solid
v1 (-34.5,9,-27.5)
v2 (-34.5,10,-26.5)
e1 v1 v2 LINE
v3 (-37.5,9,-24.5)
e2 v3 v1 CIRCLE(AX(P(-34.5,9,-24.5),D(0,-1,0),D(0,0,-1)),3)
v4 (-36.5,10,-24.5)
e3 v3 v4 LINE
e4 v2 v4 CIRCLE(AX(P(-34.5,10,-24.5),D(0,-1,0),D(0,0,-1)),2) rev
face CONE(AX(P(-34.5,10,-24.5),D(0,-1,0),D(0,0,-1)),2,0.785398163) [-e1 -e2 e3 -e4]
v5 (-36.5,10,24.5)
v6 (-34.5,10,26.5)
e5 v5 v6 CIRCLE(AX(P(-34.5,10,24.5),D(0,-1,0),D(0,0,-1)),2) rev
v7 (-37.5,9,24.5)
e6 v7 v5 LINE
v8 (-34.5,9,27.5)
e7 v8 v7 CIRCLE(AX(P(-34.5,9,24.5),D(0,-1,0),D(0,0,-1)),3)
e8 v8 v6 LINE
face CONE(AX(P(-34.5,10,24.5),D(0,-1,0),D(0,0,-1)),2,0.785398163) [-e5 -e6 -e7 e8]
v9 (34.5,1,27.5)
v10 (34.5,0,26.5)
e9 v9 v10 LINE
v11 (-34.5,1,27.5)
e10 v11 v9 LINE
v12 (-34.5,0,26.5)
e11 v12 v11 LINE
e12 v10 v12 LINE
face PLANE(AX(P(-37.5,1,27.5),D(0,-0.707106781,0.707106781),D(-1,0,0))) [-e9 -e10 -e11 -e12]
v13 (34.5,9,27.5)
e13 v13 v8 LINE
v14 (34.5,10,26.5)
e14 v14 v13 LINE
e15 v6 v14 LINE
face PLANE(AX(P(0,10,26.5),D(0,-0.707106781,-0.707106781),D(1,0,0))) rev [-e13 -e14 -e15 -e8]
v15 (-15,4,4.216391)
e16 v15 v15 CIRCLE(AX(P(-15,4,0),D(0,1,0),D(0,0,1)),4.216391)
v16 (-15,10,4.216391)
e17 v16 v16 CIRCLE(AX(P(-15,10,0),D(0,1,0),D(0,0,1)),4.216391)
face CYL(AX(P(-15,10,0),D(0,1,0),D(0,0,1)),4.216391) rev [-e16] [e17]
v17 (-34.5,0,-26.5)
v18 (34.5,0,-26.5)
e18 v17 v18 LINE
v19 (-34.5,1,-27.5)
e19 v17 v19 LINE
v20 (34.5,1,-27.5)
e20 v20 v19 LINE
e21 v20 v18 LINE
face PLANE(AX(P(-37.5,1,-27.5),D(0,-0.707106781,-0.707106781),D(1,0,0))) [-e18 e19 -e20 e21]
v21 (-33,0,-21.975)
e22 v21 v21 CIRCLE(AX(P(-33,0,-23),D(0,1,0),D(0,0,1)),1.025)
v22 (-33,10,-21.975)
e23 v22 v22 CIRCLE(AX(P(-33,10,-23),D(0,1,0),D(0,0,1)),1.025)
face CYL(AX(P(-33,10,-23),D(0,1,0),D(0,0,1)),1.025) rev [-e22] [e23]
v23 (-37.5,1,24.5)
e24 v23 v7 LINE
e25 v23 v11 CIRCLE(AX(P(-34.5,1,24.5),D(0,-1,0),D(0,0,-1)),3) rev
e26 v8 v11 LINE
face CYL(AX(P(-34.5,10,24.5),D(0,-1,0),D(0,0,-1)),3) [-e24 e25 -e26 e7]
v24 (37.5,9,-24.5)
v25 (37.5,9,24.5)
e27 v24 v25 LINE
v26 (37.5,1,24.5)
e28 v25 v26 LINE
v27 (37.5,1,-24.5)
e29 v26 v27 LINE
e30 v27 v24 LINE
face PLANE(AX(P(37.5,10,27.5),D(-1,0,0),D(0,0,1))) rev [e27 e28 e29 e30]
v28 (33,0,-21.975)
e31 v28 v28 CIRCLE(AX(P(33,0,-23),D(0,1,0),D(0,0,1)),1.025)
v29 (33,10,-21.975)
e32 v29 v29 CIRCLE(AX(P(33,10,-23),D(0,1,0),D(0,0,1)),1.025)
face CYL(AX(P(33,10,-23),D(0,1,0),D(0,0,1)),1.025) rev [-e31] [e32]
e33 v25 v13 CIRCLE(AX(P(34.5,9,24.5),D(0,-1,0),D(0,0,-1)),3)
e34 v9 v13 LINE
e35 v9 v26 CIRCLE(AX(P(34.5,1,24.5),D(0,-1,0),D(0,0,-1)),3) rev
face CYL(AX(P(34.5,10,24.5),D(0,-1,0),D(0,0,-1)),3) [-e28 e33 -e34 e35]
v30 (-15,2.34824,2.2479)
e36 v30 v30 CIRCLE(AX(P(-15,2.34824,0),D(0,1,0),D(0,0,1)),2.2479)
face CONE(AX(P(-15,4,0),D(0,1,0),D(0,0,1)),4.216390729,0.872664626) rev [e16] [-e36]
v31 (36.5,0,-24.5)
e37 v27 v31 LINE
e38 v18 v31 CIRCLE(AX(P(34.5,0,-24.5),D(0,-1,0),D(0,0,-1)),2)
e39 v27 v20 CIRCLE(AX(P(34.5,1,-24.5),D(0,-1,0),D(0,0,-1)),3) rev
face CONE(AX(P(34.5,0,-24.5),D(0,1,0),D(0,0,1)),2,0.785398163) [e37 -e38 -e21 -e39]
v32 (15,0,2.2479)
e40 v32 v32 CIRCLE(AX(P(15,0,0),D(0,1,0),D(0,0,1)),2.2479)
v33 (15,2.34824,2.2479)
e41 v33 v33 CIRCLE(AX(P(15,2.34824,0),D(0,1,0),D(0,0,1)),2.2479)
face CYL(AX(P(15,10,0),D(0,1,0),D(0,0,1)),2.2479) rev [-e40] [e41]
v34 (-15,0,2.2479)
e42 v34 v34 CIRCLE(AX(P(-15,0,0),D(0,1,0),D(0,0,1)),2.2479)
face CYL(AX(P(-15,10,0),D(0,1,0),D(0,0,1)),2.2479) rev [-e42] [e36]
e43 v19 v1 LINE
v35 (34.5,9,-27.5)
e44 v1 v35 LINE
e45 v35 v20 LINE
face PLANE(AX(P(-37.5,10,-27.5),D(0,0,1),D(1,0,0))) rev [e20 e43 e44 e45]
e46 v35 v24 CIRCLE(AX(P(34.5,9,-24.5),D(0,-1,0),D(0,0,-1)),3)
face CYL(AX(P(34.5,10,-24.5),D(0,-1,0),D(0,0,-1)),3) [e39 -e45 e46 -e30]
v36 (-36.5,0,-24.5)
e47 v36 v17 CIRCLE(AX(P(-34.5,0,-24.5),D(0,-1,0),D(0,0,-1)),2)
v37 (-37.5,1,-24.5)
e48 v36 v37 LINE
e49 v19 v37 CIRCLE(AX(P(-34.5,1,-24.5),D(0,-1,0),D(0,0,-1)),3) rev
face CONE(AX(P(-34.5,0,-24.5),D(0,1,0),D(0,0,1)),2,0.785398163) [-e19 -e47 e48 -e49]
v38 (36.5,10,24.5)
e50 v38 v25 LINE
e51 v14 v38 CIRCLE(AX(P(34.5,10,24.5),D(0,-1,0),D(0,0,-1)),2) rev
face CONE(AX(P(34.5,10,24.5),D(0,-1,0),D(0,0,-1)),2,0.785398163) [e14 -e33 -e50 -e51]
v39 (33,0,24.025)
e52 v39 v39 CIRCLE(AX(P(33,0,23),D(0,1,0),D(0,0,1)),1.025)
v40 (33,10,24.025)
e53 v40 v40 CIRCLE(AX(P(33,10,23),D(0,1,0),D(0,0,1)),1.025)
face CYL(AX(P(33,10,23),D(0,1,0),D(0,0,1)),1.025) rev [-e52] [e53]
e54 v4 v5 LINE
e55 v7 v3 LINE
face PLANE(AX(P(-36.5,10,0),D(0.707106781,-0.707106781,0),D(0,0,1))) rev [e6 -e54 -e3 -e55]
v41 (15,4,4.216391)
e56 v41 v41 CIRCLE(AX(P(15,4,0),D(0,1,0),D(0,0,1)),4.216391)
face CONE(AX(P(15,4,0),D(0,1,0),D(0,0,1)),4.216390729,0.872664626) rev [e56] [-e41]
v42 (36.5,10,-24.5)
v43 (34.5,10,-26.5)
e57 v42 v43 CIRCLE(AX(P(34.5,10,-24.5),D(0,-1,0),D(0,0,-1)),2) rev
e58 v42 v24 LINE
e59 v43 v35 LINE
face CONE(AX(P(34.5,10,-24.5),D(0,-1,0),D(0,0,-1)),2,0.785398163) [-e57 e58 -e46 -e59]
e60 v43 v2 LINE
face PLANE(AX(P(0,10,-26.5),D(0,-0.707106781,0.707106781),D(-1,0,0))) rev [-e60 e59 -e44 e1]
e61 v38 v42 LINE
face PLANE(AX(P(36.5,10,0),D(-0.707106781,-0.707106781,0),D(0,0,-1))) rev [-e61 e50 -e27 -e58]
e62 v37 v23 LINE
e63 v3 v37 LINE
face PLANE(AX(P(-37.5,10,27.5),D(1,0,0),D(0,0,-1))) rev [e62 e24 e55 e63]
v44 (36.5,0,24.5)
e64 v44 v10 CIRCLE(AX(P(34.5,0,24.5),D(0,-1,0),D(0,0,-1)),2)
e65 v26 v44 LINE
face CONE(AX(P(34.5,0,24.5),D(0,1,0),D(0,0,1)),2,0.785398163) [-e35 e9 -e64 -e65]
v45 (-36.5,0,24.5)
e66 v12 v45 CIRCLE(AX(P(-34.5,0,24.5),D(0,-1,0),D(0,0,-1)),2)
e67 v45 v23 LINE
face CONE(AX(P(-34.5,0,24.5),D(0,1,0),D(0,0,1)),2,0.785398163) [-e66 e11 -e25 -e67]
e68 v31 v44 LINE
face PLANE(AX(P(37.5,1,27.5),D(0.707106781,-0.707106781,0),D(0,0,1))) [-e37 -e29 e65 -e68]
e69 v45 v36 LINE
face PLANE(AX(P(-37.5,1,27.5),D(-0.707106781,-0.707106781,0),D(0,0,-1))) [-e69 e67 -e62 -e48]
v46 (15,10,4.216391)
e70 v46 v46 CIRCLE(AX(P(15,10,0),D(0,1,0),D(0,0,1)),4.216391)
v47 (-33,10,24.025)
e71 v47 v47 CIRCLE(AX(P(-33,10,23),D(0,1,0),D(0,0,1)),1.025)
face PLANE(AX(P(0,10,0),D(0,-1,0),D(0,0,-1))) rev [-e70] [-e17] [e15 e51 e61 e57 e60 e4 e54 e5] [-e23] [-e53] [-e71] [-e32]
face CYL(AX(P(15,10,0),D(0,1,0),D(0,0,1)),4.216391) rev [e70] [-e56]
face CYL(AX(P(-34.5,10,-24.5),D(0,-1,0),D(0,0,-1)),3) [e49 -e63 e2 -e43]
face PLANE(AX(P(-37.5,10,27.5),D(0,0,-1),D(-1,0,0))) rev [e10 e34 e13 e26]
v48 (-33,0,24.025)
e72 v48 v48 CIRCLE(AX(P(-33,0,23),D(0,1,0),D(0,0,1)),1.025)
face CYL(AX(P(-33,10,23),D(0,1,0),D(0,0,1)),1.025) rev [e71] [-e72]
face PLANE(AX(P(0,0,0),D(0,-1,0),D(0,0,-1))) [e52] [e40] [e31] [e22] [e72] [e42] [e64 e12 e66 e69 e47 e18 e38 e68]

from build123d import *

# Parameters (mm, degrees)
SKETCH1_W                                 = 75
SKETCH1_H                                 = 55
BOSS_EXTRUDE1_DEPTH                       = 10
M2_5X0_45_TAPPED_HOLE1_OUTLINE_R          = 1.025
M2_5X0_45_TAPPED_HOLE1_DEPTH              = 10
CSK_FOR_8_FLAT_HEAD_MACHINE_SCREW_2_COUNT = 2
CSK_FOR_8_FLAT_HEAD_MACHINE_SCREW_2_PITCH = 30
FILLET1_R                                 = 3
CHAMFER1_SIZE                             = 1


# Read off the part's stored shape, not the designer's step: M2.5x0.45 Tapped Hole1
with BuildPart() as part:
    # Sketch1 → Boss-Extrude1 (new body)
    with BuildSketch(Plane(origin=(0, 0, 0), x_dir=(1, 0, 0), z_dir=(0, 1, 0))):
        Rectangle(SKETCH1_W, SKETCH1_H)
    extrude(amount=BOSS_EXTRUDE1_DEPTH)

    # M2.5x0.45 Tapped Hole1 outline → M2.5x0.45 Tapped Hole1 (cut)
    with BuildSketch(Plane(origin=(0, 0, 0), x_dir=(1, 0, 0), z_dir=(0, 1, 0))):
        with Locations((33, -23)):
            Circle(M2_5X0_45_TAPPED_HOLE1_OUTLINE_R)
        with Locations((-33, 23)):
            Circle(M2_5X0_45_TAPPED_HOLE1_OUTLINE_R)
        with Locations((-33, -23)):
            Circle(M2_5X0_45_TAPPED_HOLE1_OUTLINE_R)
        with Locations((33, 23)):
            Circle(M2_5X0_45_TAPPED_HOLE1_OUTLINE_R)
    extrude(amount=M2_5X0_45_TAPPED_HOLE1_DEPTH, mode=Mode.SUBTRACT)

    # Sketch6 → CSK for #8 Flat Head Machine Screw (100)1 (revolve, cut)
    with BuildSketch(Plane(origin=(15, 10, 0), x_dir=(0, 0, 1), z_dir=(1, 0, 0))):
        Polygon((0, 0), (0, 10), (2.2479, 10), (2.2479, 7.651759845), (4.216390729, 6), (4.216390729, 0), align=None)
    csk_for_8_flat_head_machine_screw_100 = revolve(axis=Axis((15, 16.35, 0), (0, -1, 0)), mode=Mode.SUBTRACT)

    # CSK for _8 Flat Head Machine Screw _ 2: CSK for #8 Flat Head Machine Screw (100)1 ×2
    with Locations(*[(-i * CSK_FOR_8_FLAT_HEAD_MACHINE_SCREW_2_PITCH, 0, 0) for i in range(1, CSK_FOR_8_FLAT_HEAD_MACHINE_SCREW_2_COUNT)]):
        add(csk_for_8_flat_head_machine_screw_100, mode=Mode.SUBTRACT)

    # Fillet1
    fillet1_edges = [part.edges().sort_by_distance(p)[0] for p in [
        (37.5, 5, 27.5),
        (-37.5, 5, 27.5),
        (-37.5, 5, -27.5),
        (37.5, 5, -27.5),
    ]]
    fillet(fillet1_edges, radius=FILLET1_R)

    # Chamfer1
    chamfer1_edges = [part.edges().sort_by_distance(p)[0] for p in [
        (37.5, 0, 0),
        (37.5, 10, 0),
        (0, 0, 27.5),
        (-37.5, 0, 0),
        (0, 0, -27.5),
        (-36.621320344, 0, 26.621320344),
        (36.621320344, 0, -26.621320344),
        (-36.621320344, 0, -26.621320344),
        (36.621320344, 0, 26.621320344),
        (0, 10, 27.5),
        (0, 10, -27.5),
        (-37.5, 10, 0),
        (-36.621320344, 10, 26.621320344),
        (36.621320344, 10, -26.621320344),
        (-36.621320344, 10, -26.621320344),
        (36.621320344, 10, 26.621320344),
    ]]
    chamfer(chamfer1_edges, length=CHAMFER1_SIZE)


solid = part.part
